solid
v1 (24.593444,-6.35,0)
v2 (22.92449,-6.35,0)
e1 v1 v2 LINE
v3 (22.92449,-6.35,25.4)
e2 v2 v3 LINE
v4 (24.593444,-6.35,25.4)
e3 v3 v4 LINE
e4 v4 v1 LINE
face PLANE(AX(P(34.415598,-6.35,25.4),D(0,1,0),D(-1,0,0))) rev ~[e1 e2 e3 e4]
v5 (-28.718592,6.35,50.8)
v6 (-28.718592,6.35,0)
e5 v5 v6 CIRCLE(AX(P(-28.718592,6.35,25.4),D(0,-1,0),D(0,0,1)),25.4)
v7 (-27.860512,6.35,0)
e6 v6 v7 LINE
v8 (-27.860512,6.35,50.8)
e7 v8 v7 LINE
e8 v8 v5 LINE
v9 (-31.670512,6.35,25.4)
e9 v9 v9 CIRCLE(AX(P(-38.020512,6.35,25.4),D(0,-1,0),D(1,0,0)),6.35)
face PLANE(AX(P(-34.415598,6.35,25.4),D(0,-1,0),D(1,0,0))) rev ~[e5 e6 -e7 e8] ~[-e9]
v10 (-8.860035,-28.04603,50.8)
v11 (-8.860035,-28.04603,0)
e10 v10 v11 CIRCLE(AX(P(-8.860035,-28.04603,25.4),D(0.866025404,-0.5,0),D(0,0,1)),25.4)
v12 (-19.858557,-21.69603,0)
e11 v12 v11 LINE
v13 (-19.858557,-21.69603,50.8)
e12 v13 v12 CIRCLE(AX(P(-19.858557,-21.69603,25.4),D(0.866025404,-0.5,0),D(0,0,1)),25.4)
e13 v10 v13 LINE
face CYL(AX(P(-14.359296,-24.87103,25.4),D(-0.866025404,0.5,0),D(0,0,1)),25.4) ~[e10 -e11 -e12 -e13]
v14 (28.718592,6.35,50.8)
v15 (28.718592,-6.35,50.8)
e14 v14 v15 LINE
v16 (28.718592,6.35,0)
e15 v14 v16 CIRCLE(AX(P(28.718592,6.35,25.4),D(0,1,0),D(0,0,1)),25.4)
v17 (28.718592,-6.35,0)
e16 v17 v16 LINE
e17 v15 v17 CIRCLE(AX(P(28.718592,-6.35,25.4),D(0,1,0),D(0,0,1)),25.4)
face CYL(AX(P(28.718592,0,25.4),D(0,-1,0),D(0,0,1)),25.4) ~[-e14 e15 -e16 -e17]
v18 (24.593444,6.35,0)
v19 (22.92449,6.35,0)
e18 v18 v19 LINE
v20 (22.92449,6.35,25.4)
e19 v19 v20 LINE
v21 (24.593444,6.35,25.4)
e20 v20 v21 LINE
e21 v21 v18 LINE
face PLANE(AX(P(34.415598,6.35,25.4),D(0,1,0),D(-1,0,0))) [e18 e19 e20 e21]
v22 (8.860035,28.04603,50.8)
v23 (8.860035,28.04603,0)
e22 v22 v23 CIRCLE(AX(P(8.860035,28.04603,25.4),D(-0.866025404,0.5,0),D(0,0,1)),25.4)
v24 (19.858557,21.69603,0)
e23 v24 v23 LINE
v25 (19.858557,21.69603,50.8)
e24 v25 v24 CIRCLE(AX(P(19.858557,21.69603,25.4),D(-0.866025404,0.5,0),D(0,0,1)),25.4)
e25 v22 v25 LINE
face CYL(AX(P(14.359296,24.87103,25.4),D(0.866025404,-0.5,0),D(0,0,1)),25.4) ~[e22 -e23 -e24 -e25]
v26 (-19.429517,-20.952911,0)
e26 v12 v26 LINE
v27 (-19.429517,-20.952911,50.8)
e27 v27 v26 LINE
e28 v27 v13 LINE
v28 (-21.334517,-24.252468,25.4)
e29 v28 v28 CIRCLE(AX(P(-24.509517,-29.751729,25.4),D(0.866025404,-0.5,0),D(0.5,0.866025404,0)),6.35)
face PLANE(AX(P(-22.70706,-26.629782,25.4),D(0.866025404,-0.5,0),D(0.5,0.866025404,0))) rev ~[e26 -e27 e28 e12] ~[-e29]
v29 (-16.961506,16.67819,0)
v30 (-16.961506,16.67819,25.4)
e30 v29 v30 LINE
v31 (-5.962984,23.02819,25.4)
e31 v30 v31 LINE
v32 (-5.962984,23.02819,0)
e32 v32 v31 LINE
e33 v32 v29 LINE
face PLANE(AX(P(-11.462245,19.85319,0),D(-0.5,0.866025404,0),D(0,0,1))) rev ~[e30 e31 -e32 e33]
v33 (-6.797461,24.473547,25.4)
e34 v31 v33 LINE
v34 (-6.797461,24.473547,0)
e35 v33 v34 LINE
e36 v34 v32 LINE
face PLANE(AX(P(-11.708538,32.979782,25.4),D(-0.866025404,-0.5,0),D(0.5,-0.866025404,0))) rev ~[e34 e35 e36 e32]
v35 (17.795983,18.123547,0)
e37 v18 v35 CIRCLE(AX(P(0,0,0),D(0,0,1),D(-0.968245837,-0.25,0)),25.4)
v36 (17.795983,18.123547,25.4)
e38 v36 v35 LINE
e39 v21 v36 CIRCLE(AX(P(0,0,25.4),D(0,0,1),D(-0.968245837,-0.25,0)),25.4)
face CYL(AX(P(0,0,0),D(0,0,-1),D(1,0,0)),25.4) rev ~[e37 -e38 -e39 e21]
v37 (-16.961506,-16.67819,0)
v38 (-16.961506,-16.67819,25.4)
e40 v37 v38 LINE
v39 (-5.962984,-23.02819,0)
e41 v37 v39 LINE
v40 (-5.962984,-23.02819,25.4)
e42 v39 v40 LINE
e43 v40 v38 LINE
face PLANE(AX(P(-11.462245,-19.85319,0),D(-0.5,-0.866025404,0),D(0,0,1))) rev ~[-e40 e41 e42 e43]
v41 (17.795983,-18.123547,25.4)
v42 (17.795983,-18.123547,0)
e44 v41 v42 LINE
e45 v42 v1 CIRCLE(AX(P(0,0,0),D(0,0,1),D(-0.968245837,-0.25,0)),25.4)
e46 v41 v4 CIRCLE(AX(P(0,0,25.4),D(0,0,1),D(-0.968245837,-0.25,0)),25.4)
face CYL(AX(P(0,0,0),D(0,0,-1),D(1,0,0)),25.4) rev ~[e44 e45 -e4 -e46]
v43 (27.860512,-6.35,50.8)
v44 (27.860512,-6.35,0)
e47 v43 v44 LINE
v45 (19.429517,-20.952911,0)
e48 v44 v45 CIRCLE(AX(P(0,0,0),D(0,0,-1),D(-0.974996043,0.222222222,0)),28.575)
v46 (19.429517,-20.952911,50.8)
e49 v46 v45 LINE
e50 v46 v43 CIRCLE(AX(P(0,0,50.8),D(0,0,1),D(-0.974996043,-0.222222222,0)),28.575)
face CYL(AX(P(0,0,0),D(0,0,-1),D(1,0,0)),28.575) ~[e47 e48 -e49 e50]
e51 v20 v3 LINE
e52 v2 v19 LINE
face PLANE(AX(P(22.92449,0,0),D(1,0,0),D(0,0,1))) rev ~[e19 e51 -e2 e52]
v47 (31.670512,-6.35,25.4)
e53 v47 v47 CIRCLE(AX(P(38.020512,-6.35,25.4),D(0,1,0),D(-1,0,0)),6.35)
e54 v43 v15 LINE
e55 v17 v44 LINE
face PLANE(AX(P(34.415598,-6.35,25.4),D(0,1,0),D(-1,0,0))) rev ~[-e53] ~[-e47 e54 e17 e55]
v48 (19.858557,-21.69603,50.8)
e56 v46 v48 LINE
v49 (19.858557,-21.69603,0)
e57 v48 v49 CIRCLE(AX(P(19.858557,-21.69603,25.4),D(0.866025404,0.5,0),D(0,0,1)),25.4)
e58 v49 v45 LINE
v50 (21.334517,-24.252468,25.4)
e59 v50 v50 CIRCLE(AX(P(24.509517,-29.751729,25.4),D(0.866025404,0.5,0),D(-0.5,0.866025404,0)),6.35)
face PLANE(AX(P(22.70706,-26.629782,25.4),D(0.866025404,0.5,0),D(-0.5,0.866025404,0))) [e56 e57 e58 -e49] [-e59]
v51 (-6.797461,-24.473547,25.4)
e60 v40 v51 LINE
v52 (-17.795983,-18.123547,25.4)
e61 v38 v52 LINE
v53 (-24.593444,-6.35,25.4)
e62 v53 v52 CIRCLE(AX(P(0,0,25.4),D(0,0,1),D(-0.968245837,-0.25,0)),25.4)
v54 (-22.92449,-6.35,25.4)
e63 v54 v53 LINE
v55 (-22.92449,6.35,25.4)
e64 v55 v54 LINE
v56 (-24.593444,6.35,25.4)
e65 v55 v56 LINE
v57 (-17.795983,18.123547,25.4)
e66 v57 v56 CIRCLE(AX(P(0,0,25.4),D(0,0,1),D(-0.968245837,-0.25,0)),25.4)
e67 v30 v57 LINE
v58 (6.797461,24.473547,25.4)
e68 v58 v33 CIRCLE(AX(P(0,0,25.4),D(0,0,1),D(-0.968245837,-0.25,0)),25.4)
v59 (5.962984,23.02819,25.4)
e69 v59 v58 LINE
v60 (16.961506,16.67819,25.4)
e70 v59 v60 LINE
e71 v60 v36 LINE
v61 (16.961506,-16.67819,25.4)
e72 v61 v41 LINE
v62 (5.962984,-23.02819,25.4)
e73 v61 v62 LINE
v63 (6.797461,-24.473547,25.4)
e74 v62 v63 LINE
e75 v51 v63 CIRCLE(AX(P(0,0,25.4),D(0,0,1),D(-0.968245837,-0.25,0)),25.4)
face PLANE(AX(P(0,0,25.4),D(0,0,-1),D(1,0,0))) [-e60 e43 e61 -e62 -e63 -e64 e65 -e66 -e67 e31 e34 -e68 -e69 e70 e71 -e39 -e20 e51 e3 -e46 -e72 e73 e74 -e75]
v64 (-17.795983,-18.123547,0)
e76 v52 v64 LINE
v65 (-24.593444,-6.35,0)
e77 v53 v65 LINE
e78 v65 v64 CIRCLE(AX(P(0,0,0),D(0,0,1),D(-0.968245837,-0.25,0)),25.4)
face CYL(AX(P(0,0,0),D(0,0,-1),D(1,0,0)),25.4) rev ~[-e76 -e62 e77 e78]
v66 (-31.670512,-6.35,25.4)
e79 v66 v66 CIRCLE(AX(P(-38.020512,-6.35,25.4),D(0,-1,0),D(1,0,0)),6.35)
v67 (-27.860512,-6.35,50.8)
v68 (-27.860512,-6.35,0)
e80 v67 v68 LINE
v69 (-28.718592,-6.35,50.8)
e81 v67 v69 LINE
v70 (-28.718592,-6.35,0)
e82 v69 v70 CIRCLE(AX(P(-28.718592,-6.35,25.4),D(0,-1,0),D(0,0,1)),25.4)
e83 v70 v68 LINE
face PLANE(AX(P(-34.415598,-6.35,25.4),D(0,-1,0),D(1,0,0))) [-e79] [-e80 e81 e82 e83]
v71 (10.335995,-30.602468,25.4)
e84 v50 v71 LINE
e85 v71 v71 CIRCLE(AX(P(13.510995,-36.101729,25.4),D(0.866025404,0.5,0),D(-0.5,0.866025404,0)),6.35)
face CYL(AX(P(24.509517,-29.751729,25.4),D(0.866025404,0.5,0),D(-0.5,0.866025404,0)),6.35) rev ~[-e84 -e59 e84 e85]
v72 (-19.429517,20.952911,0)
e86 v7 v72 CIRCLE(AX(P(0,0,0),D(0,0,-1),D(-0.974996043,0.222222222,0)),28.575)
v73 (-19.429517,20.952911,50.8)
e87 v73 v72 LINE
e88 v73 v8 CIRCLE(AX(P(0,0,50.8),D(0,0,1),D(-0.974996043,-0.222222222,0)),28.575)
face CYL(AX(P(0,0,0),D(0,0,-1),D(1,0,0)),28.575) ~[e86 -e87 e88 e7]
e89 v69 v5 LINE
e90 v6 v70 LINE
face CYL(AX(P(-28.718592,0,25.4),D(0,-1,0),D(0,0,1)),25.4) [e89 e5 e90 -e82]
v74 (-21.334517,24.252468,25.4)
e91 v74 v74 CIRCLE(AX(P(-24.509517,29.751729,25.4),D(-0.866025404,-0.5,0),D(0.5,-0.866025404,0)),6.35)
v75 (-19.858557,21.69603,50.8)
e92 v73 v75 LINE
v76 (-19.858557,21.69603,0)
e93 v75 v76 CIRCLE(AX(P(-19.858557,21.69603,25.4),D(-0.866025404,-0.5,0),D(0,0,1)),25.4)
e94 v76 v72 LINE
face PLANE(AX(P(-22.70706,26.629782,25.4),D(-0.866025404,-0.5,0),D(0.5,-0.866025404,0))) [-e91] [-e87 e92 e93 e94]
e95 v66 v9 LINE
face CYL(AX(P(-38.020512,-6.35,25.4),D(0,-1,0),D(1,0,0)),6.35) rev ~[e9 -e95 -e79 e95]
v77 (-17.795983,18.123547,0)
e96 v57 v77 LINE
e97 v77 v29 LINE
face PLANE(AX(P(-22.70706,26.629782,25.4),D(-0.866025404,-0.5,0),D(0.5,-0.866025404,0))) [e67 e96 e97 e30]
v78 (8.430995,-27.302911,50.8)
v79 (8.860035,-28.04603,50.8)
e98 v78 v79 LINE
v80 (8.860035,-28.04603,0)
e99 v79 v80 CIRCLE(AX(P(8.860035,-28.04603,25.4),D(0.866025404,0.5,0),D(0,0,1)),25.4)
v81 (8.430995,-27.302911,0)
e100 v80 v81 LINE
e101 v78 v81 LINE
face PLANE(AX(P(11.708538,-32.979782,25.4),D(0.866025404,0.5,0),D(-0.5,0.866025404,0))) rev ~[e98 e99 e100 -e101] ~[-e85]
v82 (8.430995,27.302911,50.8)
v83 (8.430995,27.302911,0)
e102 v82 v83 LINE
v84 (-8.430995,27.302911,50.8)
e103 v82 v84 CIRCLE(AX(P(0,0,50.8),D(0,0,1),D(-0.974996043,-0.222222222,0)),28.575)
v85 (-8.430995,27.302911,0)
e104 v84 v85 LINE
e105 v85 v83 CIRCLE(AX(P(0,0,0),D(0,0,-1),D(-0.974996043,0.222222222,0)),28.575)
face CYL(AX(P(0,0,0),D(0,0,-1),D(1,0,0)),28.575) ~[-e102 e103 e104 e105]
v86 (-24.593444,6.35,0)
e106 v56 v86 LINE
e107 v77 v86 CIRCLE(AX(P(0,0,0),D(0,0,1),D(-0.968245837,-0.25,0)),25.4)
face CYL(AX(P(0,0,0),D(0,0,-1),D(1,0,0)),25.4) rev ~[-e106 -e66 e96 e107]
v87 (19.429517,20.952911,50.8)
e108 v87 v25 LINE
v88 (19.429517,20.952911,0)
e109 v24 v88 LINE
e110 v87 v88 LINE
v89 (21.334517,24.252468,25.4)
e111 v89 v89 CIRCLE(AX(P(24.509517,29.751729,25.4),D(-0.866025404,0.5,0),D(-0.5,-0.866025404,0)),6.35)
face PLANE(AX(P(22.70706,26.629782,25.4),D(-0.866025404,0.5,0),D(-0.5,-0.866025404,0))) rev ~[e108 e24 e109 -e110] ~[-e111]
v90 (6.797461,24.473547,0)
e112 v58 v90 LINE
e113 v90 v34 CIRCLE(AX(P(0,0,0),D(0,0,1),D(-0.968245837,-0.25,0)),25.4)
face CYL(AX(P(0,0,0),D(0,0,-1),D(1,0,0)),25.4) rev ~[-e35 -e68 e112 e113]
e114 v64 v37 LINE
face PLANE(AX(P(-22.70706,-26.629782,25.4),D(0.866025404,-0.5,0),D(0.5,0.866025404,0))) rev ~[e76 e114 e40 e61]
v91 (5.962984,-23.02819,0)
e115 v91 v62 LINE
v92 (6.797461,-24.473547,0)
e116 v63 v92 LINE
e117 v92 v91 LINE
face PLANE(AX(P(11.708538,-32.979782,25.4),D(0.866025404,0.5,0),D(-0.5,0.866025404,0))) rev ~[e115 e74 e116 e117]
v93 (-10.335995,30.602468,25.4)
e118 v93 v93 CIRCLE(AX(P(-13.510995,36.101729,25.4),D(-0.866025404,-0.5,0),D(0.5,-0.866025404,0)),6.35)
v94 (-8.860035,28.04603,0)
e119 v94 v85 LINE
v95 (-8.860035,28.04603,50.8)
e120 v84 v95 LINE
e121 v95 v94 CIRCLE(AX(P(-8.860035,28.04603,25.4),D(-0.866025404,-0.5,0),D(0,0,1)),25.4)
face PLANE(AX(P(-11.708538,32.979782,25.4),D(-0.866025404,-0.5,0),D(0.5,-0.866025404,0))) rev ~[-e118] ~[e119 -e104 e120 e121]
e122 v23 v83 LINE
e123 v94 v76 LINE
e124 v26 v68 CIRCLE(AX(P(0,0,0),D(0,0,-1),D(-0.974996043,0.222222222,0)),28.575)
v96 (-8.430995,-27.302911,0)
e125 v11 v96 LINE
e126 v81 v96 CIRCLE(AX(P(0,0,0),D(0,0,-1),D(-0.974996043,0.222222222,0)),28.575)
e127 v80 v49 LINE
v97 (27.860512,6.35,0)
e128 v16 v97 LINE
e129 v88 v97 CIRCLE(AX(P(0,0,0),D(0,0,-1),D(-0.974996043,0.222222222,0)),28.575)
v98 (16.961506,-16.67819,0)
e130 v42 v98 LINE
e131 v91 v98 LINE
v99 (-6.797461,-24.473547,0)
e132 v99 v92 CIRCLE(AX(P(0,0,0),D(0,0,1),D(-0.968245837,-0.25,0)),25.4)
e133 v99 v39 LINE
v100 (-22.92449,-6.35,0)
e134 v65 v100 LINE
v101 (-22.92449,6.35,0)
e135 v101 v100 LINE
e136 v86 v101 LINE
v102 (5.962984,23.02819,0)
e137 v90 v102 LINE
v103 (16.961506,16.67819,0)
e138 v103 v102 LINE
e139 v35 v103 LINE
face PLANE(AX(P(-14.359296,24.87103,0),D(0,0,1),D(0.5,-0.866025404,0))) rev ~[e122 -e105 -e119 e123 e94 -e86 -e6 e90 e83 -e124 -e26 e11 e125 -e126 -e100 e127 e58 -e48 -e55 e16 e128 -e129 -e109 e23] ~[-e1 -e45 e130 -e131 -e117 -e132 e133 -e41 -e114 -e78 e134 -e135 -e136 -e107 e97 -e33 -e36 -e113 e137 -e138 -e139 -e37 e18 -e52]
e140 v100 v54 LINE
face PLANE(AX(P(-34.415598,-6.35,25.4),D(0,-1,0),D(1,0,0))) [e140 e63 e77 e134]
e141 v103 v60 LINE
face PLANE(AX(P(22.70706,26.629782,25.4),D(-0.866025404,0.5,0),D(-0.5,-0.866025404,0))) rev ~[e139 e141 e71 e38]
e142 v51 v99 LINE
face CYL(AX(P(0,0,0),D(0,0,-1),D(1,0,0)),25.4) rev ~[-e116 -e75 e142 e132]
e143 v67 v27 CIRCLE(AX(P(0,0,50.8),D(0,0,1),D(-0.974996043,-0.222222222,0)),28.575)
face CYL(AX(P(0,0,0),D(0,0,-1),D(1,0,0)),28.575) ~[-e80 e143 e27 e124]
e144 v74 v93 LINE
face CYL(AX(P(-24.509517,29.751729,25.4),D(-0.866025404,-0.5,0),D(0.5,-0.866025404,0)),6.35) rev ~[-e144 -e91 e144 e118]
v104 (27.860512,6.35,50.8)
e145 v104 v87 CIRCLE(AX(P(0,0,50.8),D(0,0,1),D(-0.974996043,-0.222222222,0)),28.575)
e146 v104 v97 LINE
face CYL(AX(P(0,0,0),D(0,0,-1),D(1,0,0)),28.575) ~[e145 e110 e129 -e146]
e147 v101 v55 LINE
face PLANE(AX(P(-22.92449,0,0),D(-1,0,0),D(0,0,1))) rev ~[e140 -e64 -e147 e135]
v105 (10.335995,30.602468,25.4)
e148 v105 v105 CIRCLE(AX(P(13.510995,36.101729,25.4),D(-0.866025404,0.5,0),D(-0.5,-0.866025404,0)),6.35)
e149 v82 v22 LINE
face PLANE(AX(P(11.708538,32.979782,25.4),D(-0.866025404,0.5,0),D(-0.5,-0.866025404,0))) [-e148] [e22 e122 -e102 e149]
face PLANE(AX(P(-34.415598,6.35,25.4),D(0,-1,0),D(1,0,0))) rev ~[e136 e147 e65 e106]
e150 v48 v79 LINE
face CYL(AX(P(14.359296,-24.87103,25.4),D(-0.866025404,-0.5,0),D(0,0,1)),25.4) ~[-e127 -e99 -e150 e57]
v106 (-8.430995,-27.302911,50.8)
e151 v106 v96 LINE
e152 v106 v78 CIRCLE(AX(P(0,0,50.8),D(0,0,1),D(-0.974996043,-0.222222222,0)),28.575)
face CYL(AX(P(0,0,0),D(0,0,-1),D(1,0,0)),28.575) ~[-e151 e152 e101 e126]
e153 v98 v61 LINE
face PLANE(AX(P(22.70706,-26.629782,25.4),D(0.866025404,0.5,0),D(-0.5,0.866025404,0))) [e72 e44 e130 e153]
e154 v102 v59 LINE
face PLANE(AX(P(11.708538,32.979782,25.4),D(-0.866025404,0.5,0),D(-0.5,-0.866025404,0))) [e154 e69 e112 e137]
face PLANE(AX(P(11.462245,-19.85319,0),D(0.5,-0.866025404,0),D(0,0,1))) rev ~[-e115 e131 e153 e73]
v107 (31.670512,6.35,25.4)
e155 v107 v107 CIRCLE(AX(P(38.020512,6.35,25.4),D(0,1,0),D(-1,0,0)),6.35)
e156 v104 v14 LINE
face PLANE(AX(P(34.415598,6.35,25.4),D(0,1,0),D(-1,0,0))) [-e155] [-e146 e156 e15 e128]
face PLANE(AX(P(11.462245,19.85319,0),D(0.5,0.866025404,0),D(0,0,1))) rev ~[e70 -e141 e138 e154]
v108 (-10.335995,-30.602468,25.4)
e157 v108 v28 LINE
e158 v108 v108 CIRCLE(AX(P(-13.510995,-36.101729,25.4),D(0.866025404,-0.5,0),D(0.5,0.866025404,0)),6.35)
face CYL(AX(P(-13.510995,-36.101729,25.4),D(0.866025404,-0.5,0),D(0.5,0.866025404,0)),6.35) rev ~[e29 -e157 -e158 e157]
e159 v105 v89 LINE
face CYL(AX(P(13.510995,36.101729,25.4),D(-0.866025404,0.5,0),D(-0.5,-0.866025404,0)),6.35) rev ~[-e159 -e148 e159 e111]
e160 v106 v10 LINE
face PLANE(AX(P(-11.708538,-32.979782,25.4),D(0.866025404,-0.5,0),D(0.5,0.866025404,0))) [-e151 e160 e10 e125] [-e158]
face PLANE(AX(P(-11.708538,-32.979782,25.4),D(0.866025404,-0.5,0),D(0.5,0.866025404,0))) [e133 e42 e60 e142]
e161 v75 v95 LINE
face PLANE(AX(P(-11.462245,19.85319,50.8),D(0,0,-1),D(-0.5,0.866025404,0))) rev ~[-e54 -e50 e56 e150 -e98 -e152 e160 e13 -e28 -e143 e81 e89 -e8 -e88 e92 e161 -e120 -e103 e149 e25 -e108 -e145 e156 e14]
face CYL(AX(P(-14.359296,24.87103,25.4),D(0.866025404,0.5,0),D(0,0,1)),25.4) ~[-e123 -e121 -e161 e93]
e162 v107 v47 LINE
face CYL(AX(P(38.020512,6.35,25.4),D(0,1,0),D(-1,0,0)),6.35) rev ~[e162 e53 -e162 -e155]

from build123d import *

# Parameters (mm, degrees)
F0_R            = 28.575
F1_DEPTH        = 50.8
F2_R            = 25.4
F3_DEPTH        = 25.4
F5_DEPTH        = 6.35
F5_DEPTH_BACK   = 6.35
F5_COPIES_COUNT = 6
F6_R            = 6.35
F7_DEPTH        = 25.4
F7_COPIES_COUNT = 6


# Not quite as in the source:
# - a pattern or mirror of a feature is missing from the dataset's text; its kind, count and spacing are read off the source's solid


with BuildPart() as f1:
    # F0 (on Top) → F1 (new body)
    with BuildSketch(Plane.XY):
        Circle(F0_R)
    extrude(amount=F1_DEPTH)

    # F2 (on face) → F3 (cut)
    with BuildSketch(Plane(origin=(0, 0, 0), x_dir=(1, 0, 0), z_dir=(0, 0, -1))):
        Circle(F2_R)
    extrude(amount=-F3_DEPTH, mode=Mode.SUBTRACT)

    # F4 (on Front) → F5 (join, two sides)
    with BuildSketch(Plane.XZ) as f5_sk:
        with BuildLine():
            ThreePointArc((-28.718591857, 50.8), (-54.118591857, 25.4), (-28.718591857, 0))
            Line((-28.718591857, 0), (-22.9244896994, 0))
            Line((-22.9244896994, 0), (-22.9244896994, 50.8))
            Line((-22.9244896994, 50.8), (-28.718591857, 50.8))
        make_face()
    f5 = extrude(amount=F5_DEPTH) + extrude(f5_sk.sketch, amount=-F5_DEPTH_BACK)

    # F5_copies: F5 ×6 about axis
    f5_copies_axis = Axis((0, 0, 0), (0, 0, 1))
    for i in range(1, F5_COPIES_COUNT):
        add(f5.rotate(f5_copies_axis, i * 360 / F5_COPIES_COUNT))

    # F6 (on face) → F7 (cut)
    with BuildSketch(Plane.XZ.offset(6.35)):
        with Locations((-38.02051193, 25.4)):
            Circle(F6_R)
    f7 = extrude(amount=-F7_DEPTH, mode=Mode.SUBTRACT)

    # F7_copies: F7 ×6 about axis
    f7_copies_axis = Axis((0, 0, 0), (0, 0, 1))
    for i in range(1, F7_COPIES_COUNT):
        add(f7.rotate(f7_copies_axis, i * 360 / F7_COPIES_COUNT), mode=Mode.SUBTRACT)


solid = f1.part
